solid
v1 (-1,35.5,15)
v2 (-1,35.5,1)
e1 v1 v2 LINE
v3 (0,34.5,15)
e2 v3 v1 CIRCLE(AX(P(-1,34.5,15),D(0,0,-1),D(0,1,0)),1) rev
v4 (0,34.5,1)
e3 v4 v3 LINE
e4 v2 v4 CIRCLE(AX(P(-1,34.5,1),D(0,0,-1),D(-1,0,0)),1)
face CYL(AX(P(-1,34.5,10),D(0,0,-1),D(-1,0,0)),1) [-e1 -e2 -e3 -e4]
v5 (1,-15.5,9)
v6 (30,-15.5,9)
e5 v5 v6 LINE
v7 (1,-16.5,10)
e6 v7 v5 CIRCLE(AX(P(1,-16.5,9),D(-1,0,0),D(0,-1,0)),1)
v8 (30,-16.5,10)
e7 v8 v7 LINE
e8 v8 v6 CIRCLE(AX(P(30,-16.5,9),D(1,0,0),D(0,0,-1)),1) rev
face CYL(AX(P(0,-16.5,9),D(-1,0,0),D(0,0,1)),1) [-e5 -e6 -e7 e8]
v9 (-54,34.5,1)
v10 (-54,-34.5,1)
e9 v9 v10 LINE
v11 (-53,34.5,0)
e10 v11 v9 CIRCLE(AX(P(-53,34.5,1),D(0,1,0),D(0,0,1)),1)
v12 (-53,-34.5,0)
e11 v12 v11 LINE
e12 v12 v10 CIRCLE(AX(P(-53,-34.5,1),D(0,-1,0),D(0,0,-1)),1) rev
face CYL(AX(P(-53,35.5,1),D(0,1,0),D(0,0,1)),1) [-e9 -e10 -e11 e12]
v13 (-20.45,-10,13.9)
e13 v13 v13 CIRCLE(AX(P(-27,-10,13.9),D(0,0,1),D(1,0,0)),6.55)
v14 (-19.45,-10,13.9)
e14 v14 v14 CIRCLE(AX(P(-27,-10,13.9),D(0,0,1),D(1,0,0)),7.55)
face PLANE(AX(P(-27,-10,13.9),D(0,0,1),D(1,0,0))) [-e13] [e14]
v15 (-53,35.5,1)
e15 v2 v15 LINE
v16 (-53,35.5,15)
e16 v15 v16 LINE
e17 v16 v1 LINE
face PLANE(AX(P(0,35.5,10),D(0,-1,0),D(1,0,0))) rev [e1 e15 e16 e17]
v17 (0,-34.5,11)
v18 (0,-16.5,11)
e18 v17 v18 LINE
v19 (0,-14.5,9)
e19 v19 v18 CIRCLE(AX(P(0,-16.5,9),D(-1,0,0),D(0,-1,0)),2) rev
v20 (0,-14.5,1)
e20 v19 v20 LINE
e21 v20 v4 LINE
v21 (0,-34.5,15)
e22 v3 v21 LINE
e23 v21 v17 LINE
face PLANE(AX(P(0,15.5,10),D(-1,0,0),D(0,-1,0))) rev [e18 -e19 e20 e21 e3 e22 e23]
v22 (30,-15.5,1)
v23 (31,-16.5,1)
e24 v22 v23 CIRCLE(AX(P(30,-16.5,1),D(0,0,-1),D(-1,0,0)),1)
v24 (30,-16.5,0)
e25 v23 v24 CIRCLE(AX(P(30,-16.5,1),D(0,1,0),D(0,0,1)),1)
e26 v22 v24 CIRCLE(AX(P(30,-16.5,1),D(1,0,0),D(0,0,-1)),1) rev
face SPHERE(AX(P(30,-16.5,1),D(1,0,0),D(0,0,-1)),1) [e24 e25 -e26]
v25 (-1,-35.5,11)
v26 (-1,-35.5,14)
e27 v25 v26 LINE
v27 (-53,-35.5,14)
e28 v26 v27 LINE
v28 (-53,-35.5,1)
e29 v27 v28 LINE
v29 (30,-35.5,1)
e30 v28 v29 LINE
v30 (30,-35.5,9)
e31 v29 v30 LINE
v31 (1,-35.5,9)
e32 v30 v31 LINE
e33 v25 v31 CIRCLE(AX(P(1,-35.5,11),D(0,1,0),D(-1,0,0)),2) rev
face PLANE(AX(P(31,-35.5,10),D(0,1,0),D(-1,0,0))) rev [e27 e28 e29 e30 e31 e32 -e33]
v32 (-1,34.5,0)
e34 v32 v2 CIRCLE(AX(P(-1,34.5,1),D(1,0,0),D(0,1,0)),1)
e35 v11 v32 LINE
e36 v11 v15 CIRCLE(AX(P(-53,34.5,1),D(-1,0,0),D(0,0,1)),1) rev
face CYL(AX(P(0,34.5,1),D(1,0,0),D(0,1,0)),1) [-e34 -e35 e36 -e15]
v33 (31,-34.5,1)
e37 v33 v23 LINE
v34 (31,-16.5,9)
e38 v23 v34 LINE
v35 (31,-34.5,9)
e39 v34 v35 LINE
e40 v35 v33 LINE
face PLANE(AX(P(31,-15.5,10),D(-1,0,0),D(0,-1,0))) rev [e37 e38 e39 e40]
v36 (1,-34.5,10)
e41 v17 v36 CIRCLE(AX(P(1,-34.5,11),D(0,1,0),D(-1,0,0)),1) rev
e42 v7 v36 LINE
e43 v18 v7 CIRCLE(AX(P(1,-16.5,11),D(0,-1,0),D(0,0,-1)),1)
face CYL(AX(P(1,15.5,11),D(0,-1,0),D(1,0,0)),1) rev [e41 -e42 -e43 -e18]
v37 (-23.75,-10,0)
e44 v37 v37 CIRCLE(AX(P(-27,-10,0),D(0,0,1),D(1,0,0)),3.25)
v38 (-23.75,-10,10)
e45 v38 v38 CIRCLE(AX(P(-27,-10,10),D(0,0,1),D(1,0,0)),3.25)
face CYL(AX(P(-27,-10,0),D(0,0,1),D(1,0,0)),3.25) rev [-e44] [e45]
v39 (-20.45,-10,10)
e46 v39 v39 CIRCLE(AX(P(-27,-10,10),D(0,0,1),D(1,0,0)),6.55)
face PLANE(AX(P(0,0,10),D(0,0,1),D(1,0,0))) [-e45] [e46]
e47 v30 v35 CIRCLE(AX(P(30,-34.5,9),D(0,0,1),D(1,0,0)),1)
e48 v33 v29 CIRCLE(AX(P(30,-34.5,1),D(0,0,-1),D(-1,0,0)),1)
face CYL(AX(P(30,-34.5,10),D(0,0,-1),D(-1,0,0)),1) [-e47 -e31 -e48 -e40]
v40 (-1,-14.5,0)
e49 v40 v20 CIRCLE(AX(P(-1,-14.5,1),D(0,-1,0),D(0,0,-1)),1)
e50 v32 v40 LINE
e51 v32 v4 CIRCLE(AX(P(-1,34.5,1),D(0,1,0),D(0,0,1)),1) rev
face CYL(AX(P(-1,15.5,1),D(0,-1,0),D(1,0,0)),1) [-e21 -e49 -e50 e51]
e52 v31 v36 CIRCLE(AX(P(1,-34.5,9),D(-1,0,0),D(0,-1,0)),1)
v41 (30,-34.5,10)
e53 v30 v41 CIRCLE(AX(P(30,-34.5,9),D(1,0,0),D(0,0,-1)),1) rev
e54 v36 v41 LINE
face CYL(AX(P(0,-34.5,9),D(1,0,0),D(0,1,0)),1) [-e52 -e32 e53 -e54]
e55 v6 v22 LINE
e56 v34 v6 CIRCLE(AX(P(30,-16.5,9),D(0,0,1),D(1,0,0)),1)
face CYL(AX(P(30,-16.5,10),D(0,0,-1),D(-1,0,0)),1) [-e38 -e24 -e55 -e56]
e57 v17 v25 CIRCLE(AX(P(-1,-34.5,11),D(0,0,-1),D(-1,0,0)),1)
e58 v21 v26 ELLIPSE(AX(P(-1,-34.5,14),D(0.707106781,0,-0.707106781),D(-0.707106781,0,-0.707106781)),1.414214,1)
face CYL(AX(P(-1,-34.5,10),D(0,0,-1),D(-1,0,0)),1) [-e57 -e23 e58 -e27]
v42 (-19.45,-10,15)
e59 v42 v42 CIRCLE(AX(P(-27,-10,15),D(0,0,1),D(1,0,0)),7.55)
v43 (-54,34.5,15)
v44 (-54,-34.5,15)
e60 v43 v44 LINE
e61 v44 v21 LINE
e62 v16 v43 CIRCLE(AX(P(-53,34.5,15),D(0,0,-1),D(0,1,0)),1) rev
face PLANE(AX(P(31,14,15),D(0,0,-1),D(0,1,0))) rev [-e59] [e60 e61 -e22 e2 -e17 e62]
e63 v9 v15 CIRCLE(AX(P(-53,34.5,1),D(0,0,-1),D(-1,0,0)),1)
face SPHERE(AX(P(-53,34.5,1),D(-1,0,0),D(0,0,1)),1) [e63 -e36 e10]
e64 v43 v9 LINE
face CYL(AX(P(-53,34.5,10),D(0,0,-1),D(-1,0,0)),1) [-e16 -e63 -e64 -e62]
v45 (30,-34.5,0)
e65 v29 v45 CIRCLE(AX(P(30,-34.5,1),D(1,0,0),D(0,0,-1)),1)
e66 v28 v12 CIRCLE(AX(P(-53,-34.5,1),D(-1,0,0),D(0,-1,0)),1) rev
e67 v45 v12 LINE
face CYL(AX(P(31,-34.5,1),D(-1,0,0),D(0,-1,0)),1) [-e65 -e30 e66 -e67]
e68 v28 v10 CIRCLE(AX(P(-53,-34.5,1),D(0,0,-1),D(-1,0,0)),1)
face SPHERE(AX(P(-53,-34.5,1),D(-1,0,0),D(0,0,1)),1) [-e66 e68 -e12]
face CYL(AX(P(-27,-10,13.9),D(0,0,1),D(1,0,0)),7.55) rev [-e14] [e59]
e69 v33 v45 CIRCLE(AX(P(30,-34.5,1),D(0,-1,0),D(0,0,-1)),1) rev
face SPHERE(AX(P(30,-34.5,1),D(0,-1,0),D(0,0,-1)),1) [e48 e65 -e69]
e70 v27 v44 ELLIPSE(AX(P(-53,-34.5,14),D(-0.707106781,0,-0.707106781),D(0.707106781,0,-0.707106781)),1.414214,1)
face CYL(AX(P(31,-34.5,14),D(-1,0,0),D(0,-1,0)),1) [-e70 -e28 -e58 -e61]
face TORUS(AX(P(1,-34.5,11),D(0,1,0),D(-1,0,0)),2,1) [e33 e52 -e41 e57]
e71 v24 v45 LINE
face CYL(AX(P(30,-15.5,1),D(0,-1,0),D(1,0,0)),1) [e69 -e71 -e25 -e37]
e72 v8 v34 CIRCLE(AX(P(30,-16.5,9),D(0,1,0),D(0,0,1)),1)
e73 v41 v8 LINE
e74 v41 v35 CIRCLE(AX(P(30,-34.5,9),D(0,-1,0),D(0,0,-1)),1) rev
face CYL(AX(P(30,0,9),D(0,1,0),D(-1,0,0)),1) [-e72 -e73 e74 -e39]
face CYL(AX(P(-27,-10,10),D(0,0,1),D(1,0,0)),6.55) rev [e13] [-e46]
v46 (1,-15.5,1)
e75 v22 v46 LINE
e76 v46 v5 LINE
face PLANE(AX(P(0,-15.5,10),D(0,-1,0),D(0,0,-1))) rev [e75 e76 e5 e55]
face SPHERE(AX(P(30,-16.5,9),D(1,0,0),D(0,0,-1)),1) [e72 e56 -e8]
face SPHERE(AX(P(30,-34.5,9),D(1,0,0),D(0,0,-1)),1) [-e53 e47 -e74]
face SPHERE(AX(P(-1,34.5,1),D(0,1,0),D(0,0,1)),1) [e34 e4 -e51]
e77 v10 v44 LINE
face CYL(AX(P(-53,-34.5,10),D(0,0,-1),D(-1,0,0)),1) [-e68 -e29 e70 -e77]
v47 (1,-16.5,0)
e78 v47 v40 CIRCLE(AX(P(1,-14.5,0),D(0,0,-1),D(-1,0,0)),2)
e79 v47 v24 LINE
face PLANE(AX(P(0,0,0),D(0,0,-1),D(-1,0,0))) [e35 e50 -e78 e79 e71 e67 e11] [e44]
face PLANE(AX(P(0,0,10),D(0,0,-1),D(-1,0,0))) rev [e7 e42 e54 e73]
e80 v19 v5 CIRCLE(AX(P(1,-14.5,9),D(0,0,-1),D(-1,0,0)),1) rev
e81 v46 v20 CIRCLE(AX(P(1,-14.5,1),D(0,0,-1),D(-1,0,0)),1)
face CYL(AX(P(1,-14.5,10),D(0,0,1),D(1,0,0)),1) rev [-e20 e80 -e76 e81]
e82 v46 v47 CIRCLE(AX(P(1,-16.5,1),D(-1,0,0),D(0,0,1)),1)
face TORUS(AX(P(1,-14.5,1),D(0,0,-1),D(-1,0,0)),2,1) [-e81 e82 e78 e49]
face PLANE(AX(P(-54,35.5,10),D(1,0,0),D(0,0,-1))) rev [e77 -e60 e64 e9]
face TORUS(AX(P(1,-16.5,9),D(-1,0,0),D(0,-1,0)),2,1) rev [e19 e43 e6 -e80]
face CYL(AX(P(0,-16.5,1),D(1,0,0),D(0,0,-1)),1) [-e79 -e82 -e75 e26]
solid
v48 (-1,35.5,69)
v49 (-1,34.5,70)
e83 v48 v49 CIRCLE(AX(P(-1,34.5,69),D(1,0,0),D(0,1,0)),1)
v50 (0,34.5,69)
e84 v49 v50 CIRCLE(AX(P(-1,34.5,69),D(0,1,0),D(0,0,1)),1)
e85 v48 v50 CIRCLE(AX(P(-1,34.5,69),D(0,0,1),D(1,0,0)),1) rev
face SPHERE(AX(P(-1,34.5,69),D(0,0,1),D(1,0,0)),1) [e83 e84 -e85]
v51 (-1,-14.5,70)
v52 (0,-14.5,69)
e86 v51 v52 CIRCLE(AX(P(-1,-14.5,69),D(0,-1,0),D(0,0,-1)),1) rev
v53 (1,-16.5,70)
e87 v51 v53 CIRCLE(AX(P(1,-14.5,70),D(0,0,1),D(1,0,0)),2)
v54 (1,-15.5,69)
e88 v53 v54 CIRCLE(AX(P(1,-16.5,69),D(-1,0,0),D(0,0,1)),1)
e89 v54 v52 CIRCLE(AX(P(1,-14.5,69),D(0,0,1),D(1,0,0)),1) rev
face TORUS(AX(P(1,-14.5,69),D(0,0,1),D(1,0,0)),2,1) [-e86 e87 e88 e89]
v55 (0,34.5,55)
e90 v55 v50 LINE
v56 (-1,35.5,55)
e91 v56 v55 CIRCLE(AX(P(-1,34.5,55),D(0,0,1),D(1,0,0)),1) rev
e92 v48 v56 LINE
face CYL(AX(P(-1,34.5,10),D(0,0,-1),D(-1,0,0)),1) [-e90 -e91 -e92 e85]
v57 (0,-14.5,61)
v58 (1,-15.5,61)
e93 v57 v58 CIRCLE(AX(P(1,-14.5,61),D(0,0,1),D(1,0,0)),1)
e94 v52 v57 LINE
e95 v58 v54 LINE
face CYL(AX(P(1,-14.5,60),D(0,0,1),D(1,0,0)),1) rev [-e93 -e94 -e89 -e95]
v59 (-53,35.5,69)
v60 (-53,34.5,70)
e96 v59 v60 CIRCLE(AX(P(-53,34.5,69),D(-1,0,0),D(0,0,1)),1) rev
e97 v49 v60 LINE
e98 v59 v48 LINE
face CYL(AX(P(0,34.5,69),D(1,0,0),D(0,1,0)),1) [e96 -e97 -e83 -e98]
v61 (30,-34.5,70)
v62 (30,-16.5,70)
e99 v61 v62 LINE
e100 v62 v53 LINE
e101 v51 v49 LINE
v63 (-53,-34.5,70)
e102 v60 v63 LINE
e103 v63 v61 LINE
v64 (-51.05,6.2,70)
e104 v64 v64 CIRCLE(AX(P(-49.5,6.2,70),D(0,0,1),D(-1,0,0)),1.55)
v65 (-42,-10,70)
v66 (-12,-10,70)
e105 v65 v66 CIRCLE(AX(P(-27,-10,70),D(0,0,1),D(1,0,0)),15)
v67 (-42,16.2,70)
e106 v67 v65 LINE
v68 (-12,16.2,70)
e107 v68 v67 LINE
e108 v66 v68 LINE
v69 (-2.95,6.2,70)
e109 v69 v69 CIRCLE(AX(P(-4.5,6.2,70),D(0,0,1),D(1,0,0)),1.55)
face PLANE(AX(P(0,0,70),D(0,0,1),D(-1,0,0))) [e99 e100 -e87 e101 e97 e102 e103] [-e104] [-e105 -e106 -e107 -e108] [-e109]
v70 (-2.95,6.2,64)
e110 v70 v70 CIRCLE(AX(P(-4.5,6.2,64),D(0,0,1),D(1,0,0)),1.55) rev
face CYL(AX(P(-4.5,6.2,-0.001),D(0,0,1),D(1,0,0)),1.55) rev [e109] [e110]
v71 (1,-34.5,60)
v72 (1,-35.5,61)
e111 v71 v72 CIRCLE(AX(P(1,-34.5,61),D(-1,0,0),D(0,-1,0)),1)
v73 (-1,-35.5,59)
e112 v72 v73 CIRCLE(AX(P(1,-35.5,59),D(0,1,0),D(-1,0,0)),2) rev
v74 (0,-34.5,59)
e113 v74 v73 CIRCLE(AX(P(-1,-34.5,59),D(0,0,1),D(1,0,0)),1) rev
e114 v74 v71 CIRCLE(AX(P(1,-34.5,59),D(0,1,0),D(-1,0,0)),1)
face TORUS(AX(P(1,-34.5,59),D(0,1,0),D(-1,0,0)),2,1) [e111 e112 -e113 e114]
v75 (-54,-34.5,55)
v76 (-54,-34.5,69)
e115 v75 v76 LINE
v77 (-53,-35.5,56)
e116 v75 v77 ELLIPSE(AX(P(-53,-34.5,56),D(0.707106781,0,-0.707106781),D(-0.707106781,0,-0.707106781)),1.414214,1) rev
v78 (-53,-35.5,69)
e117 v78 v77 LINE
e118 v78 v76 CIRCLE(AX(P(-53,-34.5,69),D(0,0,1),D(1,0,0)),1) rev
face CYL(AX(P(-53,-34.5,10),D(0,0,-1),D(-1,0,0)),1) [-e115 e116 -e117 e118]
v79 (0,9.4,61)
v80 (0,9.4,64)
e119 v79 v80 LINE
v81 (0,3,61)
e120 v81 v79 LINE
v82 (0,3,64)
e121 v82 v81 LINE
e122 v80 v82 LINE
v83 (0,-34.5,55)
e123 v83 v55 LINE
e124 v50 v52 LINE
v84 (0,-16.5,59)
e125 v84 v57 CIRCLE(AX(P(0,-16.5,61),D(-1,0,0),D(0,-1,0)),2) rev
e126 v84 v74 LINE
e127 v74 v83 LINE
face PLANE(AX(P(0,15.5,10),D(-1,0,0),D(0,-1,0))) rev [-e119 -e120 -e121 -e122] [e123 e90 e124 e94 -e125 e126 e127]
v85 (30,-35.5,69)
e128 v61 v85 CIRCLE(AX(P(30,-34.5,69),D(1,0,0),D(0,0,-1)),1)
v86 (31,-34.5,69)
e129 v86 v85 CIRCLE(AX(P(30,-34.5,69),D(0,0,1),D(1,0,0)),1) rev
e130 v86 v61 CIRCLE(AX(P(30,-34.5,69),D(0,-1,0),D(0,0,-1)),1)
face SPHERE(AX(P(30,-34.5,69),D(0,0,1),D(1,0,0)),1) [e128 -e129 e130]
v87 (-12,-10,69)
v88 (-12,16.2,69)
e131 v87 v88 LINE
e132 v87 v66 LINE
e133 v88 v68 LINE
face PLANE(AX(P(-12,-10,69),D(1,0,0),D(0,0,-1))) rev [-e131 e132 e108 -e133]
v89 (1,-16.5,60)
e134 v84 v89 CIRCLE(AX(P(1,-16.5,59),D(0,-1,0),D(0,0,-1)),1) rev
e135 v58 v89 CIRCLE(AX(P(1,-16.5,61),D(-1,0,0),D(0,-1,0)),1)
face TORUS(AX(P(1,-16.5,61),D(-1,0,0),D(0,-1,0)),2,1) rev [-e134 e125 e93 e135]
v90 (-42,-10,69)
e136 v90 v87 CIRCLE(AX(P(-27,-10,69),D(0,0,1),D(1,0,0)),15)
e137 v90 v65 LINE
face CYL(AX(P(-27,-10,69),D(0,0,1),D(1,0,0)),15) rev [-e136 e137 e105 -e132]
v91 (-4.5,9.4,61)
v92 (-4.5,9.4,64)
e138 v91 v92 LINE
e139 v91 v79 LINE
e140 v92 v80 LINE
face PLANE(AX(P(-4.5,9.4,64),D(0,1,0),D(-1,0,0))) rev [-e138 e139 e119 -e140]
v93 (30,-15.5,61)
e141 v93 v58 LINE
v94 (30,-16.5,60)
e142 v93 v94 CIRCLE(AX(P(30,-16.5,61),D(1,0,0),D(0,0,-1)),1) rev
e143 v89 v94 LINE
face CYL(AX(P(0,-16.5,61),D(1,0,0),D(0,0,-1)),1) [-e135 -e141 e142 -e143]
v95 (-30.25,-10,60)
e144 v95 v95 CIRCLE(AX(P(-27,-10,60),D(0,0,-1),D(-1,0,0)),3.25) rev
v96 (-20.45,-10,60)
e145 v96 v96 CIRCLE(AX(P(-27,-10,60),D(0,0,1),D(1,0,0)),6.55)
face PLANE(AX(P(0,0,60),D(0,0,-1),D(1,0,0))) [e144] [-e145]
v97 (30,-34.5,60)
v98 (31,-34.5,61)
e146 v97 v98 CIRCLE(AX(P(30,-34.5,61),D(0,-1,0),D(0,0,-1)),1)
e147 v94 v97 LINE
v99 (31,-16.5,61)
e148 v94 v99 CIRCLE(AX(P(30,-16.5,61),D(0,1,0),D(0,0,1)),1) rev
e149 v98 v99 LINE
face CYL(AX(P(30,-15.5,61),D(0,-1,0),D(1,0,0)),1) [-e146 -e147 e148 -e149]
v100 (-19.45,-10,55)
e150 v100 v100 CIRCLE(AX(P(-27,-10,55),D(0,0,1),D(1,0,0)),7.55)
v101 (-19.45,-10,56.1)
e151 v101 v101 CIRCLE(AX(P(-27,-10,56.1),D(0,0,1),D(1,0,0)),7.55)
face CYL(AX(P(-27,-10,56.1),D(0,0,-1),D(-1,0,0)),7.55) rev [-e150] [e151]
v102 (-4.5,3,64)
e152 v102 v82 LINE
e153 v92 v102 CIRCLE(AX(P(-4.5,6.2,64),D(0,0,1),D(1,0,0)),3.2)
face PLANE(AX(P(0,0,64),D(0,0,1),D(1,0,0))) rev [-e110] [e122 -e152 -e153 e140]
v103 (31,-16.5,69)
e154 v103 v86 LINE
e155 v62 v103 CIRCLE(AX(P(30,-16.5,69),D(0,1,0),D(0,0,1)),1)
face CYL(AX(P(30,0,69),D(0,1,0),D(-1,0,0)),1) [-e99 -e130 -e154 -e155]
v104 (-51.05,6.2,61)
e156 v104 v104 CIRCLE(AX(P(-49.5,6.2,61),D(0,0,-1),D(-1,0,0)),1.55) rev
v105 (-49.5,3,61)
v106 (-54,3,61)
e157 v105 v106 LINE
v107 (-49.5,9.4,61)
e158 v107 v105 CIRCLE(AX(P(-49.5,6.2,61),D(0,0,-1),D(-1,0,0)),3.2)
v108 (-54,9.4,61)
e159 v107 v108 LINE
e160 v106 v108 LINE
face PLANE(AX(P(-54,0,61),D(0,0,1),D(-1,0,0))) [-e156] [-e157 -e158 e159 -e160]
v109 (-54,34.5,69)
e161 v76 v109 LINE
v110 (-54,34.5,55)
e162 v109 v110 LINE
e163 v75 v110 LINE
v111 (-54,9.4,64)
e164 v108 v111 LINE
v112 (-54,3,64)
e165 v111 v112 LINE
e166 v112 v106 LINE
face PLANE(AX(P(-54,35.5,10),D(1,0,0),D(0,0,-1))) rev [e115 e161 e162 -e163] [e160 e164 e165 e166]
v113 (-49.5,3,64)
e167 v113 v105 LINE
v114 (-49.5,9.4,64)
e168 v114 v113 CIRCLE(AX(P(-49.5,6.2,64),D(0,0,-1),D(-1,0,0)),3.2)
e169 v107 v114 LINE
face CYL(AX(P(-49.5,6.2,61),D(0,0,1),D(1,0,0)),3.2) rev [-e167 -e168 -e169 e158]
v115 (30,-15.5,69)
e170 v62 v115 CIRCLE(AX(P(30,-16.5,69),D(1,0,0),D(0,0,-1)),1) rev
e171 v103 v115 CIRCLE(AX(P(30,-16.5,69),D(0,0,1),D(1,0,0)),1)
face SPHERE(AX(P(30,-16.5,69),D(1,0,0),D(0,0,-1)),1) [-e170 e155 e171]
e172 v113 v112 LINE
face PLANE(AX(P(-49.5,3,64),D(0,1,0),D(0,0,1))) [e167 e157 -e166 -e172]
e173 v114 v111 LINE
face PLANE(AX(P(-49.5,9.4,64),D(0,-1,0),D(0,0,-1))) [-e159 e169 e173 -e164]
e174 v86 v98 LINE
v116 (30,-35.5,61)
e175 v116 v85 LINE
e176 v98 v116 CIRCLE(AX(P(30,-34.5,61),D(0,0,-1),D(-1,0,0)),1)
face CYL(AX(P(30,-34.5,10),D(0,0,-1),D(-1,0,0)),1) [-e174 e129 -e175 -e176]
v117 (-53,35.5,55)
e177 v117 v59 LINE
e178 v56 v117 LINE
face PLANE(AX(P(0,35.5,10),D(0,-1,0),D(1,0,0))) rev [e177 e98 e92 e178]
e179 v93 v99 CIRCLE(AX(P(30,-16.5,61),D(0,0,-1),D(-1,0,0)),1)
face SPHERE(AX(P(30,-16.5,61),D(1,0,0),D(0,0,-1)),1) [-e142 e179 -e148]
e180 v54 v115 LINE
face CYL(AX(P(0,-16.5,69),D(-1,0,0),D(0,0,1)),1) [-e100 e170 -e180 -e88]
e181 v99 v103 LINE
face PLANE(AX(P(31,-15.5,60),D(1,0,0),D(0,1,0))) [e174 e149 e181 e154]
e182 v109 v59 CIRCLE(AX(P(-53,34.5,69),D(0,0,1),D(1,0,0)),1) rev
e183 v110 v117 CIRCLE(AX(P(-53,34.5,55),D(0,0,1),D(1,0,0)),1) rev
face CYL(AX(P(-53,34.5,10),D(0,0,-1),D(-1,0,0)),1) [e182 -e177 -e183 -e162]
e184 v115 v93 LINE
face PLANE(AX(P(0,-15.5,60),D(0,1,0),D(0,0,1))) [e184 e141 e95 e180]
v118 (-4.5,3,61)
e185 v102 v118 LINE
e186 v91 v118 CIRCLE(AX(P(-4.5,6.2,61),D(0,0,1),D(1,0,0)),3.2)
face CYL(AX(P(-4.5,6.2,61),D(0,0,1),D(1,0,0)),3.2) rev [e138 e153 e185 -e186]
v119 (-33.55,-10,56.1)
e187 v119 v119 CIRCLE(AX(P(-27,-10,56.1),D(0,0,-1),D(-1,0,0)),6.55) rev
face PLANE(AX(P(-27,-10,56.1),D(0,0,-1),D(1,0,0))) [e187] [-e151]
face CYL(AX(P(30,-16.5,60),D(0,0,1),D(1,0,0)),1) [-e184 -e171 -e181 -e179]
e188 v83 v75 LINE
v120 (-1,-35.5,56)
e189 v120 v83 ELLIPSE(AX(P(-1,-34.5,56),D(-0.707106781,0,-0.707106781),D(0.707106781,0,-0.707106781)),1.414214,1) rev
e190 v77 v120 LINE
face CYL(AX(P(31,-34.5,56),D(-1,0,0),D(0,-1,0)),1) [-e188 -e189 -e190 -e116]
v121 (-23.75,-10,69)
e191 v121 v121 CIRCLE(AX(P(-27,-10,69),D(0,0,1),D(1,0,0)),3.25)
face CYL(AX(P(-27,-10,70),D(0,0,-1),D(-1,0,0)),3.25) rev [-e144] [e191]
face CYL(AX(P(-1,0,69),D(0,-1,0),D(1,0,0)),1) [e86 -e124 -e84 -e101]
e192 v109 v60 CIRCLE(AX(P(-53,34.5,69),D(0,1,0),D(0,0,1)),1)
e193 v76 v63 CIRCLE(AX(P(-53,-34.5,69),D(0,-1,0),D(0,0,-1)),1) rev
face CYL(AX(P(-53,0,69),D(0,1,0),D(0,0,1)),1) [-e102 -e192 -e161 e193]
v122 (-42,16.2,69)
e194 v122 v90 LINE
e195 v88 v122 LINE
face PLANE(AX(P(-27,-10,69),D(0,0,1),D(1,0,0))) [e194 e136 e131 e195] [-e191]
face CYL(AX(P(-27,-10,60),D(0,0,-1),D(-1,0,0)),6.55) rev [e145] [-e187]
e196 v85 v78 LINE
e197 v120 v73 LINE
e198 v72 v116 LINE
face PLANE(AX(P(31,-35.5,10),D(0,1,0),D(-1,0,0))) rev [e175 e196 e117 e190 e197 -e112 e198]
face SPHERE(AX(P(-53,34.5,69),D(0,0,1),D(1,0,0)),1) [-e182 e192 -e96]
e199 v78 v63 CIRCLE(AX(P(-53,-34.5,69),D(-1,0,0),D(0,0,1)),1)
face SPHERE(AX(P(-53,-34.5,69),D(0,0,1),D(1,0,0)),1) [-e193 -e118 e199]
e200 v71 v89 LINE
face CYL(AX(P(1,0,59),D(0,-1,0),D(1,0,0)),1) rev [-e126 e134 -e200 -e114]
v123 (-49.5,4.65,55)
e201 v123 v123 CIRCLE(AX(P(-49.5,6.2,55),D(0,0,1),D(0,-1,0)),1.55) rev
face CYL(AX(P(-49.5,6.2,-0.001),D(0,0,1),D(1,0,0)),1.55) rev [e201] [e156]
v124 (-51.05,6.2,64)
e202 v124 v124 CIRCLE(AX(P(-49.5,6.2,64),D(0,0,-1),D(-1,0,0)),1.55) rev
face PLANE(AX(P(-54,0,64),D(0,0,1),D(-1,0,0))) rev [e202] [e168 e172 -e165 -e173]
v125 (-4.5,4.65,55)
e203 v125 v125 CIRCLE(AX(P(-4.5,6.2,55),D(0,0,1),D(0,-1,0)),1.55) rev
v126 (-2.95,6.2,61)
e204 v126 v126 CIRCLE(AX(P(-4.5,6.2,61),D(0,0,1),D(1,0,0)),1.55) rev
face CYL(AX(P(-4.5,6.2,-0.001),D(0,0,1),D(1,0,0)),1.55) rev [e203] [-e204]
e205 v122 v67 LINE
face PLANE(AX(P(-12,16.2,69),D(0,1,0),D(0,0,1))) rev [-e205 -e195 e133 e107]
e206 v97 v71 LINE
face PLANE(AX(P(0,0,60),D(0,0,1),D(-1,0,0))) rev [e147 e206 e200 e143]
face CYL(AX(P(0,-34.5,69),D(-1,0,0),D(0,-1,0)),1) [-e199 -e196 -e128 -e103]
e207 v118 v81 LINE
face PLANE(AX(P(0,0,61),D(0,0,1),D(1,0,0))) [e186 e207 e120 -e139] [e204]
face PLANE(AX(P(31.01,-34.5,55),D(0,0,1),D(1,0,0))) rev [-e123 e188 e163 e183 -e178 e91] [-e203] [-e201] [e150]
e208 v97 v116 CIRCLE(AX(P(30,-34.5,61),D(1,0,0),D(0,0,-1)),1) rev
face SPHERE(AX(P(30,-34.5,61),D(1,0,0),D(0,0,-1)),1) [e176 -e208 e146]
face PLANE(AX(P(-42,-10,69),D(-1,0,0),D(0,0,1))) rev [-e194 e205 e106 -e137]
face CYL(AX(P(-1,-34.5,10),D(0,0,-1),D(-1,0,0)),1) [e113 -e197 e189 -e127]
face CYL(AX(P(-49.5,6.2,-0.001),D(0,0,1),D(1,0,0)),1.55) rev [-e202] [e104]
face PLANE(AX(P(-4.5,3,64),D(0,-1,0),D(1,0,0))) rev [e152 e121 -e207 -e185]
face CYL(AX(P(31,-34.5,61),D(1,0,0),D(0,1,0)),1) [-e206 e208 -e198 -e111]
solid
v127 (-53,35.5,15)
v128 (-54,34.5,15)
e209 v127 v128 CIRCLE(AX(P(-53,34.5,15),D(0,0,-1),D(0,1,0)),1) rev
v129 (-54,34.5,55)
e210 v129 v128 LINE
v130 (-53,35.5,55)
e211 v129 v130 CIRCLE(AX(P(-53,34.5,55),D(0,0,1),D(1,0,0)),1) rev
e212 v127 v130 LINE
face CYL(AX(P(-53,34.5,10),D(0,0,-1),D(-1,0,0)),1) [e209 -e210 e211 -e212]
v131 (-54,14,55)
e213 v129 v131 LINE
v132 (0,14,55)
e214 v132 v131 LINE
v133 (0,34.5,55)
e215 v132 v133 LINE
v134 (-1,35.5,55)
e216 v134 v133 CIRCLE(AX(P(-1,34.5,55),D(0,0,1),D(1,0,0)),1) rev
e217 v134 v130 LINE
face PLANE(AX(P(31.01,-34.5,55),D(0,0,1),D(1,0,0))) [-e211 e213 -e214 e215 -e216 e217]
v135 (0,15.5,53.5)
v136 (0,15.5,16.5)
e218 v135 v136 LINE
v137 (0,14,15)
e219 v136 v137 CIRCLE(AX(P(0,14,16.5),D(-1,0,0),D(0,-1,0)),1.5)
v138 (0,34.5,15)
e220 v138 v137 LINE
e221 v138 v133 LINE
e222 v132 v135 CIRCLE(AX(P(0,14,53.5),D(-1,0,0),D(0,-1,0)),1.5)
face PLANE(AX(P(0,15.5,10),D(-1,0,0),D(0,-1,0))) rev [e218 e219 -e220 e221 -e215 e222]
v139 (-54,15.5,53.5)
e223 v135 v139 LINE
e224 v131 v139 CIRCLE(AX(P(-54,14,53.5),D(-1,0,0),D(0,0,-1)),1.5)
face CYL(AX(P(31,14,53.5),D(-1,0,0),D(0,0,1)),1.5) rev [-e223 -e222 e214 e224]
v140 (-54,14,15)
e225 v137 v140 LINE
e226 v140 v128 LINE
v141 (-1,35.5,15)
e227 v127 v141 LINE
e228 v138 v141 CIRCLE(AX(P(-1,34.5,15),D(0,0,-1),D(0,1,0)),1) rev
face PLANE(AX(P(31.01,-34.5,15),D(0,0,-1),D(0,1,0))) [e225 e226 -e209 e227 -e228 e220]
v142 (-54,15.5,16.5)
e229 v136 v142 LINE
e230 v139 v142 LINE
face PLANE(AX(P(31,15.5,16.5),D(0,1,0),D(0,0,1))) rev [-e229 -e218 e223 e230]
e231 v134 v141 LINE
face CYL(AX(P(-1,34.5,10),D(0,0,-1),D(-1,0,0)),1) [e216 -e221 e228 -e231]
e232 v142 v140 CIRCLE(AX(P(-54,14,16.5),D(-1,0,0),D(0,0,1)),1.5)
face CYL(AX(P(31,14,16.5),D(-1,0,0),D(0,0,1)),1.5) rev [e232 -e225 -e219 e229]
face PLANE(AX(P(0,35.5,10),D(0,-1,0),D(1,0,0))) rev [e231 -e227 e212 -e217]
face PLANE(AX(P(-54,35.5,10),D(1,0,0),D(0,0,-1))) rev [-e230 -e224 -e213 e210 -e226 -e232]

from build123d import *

# Parameters (mm, degrees)
BOSS_EXTRU_1_DEPTH           = 10
ESQUISSE2_W                  = 54
ESQUISSE2_H                  = 71
BOSS_EXTRU_2_DEPTH           = 50
CONG_2_R                     = 1
ENL_V_MAT_EXTRU_1_DEPTH      = 116.69464119
ESQUISSE6_R                  = 7.55
ENL_V_MAT_EXTRU_3_DEPTH      = 1.1
ESQUISSE6_4_R                = 6.55
ENL_V_MAT_EXTRU_4_DEPTH      = 5
ESQUISSE6_5_R                = 3.25
ENL_V_MAT_EXTRU_5_DEPTH      = 85.860179118
ESQUISSE7_R                  = 3.25
ENL_V_MAT_EXTRU_6_DEPTH      = 1
ENL_V_MAT_EXTRU_7_REACH      = 97.269
ESQUISSE8_R                  = 1.55
ENL_V_START                  = -6
ESQUISSE10_R                 = 3.2
ENL_V_MAT_EXTRU_11_DEPTH     = 3
ESQUISSE9_W                  = 3
ESQUISSE9_H                  = 6.4
ENL_V_MAT_EXTRU_12_DEPTH     = 4.5
CONG_3_R                     = 1
FRACTIONNER1_SURFACE_1_BACK  = 132.019
FRACTIONNER1_SURFACE_1_DEPTH = 264.038
FRACTIONNER1_SURFACE_2_BACK  = 132.019
FRACTIONNER1_SURFACE_2_DEPTH = 264.038


with BuildPart() as part:
    # Esquisse1 → Boss.-Extru.1 (new body)
    with BuildSketch(Plane.XY):
        Polygon((0, 15.5), (0, -15.5), (31, -15.5), (31, -35.5), (-54, -35.5), (-54, 35.5), (0, 35.5), align=None)
    boss_extru_1 = extrude(amount=BOSS_EXTRU_1_DEPTH)

    # Esquisse2 → Boss.-Extru.2 (add)
    with BuildSketch(Plane.XY.offset(10)):
        with Locations((-27, 0)):
            Rectangle(ESQUISSE2_W, ESQUISSE2_H)
    extrude(amount=BOSS_EXTRU_2_DEPTH)

    # Symétrie2: Boss.-Extru.1 across plane
    add(boss_extru_1.mirror(Plane.XY.offset(35)))

    # Congé2
    cong_2_edges = [part.edges().sort_by_distance(p)[0] for p in [
        (15.5, -15.5, 0),
        (31, -15.5, 5),
        (31, -35.5, 5),
        (-54, -35.5, 35),
        (-54, 35.5, 35),
        (0, 35.5, 35),
        (0, -15.5, 5),
        (15.5, -35.5, 10),
        (0, -25.5, 10),
        (0, -35.5, 35),
        (0, -25.5, 60),
        (31, -25.5, 10),
        (15.5, -15.5, 60),
        (0, -15.5, 65),
        (31, -25.5, 60),
        (31, -15.5, 65),
        (15.5, -35.5, 60),
        (31, -35.5, 65),
        (15.5, -15.5, 70),
        (0, 10, 70),
        (-27, 35.5, 70),
        (-54, 0, 70),
        (-11.5, -35.5, 70),
        (31, -25.5, 70),
        (15.5, -15.5, 10),
        (31, -25.5, 0),
        (-11.5, -35.5, 0),
        (-54, 0, 0),
        (-27, 35.5, 0),
        (0, 10, 0),
    ]]
    fillet(cong_2_edges, radius=CONG_2_R)

    # Esquisse3 → Enlèv. mat.-Extru.1 (cut, through all)
    with BuildSketch(Plane.ZY.offset(54)):
        with BuildLine():
            Line((16.5, 15.5), (53.5, 15.5))
            ThreePointArc((53.5, 15.5), (54.560660172, 15.060660172), (55, 14))
            Line((55, 14), (55, -35.5))
            Line((55, -35.5), (15, -35.5))
            Line((15, -35.5), (15, 14))
            ThreePointArc((15, 14), (15.439339828, 15.060660172), (16.5, 15.5))
        make_face()
    extrude(amount=-ENL_V_MAT_EXTRU_1_DEPTH, mode=Mode.SUBTRACT)

    # Esquisse6 → Enlèv. mat.-Extru.3 (cut)
    with BuildSketch(Plane.XY.offset(15)):
        with Locations((-27, -10)):
            Circle(ESQUISSE6_R)
    enl_v_mat_extru_3 = extrude(amount=-ENL_V_MAT_EXTRU_3_DEPTH, mode=Mode.SUBTRACT)

    # Esquisse6<4> → Enlèv. mat.-Extru.4 (cut)
    with BuildSketch(Plane.XY.offset(15)):
        with Locations((-27, -10)):
            Circle(ESQUISSE6_4_R)
    enl_v_mat_extru_4 = extrude(amount=-ENL_V_MAT_EXTRU_4_DEPTH, mode=Mode.SUBTRACT)

    # Esquisse6<5> → Enlèv. mat.-Extru.5 (cut, through all)
    with BuildSketch(Plane.XY.offset(15)):
        with Locations((-27, -10)):
            Circle(ESQUISSE6_5_R)
    enl_v_mat_extru_5 = extrude(amount=-ENL_V_MAT_EXTRU_5_DEPTH, mode=Mode.SUBTRACT)

    # Symétrie3: Enlèv. mat.-Extru.3, Enlèv. mat.-Extru.4, Enlèv. mat.-Extru.5 across plane
    add(enl_v_mat_extru_3.mirror(Plane.XY.offset(35)), mode=Mode.SUBTRACT)
    add(enl_v_mat_extru_4.mirror(Plane.XY.offset(35)), mode=Mode.SUBTRACT)
    add(enl_v_mat_extru_5.mirror(Plane.XY.offset(35)), mode=Mode.SUBTRACT)

    # Esquisse7 → Enlèv. mat.-Extru.6 (cut)
    with BuildSketch(Plane.XY.offset(70)):
        with BuildLine():
            Line((-42, -10), (-42, 16.2))
            Line((-42, 16.2), (-12, 16.2))
            Line((-12, 16.2), (-12, -10))
            ThreePointArc((-12, -10), (-27, -25), (-42, -10))
        make_face()
        with Locations(Location((-27, -10, 0), (0, 0, 180))):
            Circle(ESQUISSE7_R, mode=Mode.SUBTRACT)
    extrude(amount=-ENL_V_MAT_EXTRU_6_DEPTH, mode=Mode.SUBTRACT)

    # Esquisse8 → Enlèv. mat.-Extru.7 (cut, up to next)
    with BuildSketch(Plane.XY.offset(70), mode=Mode.PRIVATE) as enl_v_mat_extru_7_sk1:
        with Locations((-4.5, 6.2)):
            Circle(ESQUISSE8_R)
    enl_v_mat_extru_7_tool1 = extrude(enl_v_mat_extru_7_sk1.sketch, amount=-ENL_V_MAT_EXTRU_7_REACH, mode=Mode.PRIVATE) & part.part
    # Esquisse8 → Enlèv. mat.-Extru.7 (cut, up to next)
    with BuildSketch(Plane.XY.offset(70), mode=Mode.PRIVATE) as enl_v_mat_extru_7_sk2:
        with Locations(Location((-49.5, 6.2, 0), (0, 0, 270))):
            Circle(ESQUISSE8_R)
    enl_v_mat_extru_7_tool2 = extrude(enl_v_mat_extru_7_sk2.sketch, amount=-ENL_V_MAT_EXTRU_7_REACH, mode=Mode.PRIVATE) & part.part
    add(enl_v_mat_extru_7_tool1.solids().sort_by_distance((-4.5, 6.2, 70))[0], mode=Mode.SUBTRACT)
    add(enl_v_mat_extru_7_tool2.solids().sort_by_distance((-49.5, 6.2, 70))[0], mode=Mode.SUBTRACT)

    # Esquisse10 → Enlèv. mat.-Extru.11 (cut)
    with BuildSketch(Plane.XY.offset(70).offset(ENL_V_START)):
        with Locations((-4.5, 6.2)):
            Circle(ESQUISSE10_R)
    enl_v_mat_extru_11 = extrude(amount=-ENL_V_MAT_EXTRU_11_DEPTH, mode=Mode.SUBTRACT)

    # Esquisse9 → Enlèv. mat.-Extru.12 (cut)
    with BuildSketch(Plane(origin=(0, 0, 0), x_dir=(0, 0, -1), z_dir=(1, 0, 0))):
        with Locations((-62.5, 6.2)):
            Rectangle(ESQUISSE9_W, ESQUISSE9_H)
    enl_v_mat_extru_12 = extrude(amount=-ENL_V_MAT_EXTRU_12_DEPTH, mode=Mode.SUBTRACT)

    # Symétrie4: Enlèv. mat.-Extru.11, Enlèv. mat.-Extru.12 across plane
    add(enl_v_mat_extru_11.mirror(Plane(origin=(-27, 0, 0), x_dir=(0, 0, 1), z_dir=(1, 0, 0))), mode=Mode.SUBTRACT)
    add(enl_v_mat_extru_12.mirror(Plane(origin=(-27, 0, 0), x_dir=(0, 0, 1), z_dir=(1, 0, 0))), mode=Mode.SUBTRACT)

    # Congé3
    # the kernel refuses this fillet: 1 mm, written as the material it takes off along each edge
    with BuildSketch(Plane(origin=(-55.5, -35.5, 55), x_dir=(0, 0, 1), z_dir=(1, 0, 0))) as cong_3_piece_1:
        with BuildLine():
            CenterArc((CONG_3_R, -CONG_3_R), CONG_3_R, 90, 90)
            Line((0, -CONG_3_R), (0, 0))
            Line((0, 0), (CONG_3_R, 0))
        make_face()
    extrude(amount=57, mode=Mode.SUBTRACT)
    with BuildSketch(Plane(origin=(-55.5, -35.5, 15), x_dir=(0, 0, -1), z_dir=(1, 0, 0))) as cong_3_piece_2:
        with BuildLine():
            CenterArc((CONG_3_R, CONG_3_R), CONG_3_R, 180, 90)
            Line((0, CONG_3_R), (0, 0))
            Line((0, 0), (CONG_3_R, 0))
        make_face()
    extrude(amount=57, mode=Mode.SUBTRACT)


with BuildPart() as body_2:
    # Fractionner1: the piece behind the surface
    add(part.part)
    # Fractionner1 surface: a surface, the sketch's curves swept straight by 264.038 mm
    with BuildLine(Plane.ZY.offset(54).offset(-FRACTIONNER1_SURFACE_1_BACK), mode=Mode.PRIVATE) as fractionner1_surface_1_path:
        Line((15, -34.5), (15, 35.5))
        Line((15, 35.5), (55, 35.5))
        Line((55, 35.5), (55, -34.5))
        Line((55, -34.5), (55, -35.5))
        Line((55, -35.5), (15, -35.5))
        Line((15, -35.5), (15, -34.5))
    fractionner1_surface_1 = Shell.extrude(fractionner1_surface_1_path.wire(), (-1 * FRACTIONNER1_SURFACE_1_DEPTH, 0 * FRACTIONNER1_SURFACE_1_DEPTH, 0 * FRACTIONNER1_SURFACE_1_DEPTH))
    split(bisect_by=fractionner1_surface_1, keep=Keep.BOTTOM)


with BuildPart() as part_1:
    add(part.part)

    # Fractionner1: split by a surface, the side it looks to stays
    # Fractionner1 surface: a surface, the sketch's curves swept straight by 264.038 mm
    with BuildLine(Plane.ZY.offset(54).offset(-FRACTIONNER1_SURFACE_2_BACK), mode=Mode.PRIVATE) as fractionner1_surface_2_path:
        Line((15, -34.5), (15, 35.5))
        Line((15, 35.5), (55, 35.5))
        Line((55, 35.5), (55, -34.5))
        Line((55, -34.5), (55, -35.5))
        Line((55, -35.5), (15, -35.5))
        Line((15, -35.5), (15, -34.5))
    fractionner1_surface_2 = Shell.extrude(fractionner1_surface_2_path.wire(), (-1 * FRACTIONNER1_SURFACE_2_DEPTH, 0 * FRACTIONNER1_SURFACE_2_DEPTH, 0 * FRACTIONNER1_SURFACE_2_DEPTH))
    split(bisect_by=fractionner1_surface_2, keep=Keep.TOP)


solid = Compound([body_2.part, part_1.part])
